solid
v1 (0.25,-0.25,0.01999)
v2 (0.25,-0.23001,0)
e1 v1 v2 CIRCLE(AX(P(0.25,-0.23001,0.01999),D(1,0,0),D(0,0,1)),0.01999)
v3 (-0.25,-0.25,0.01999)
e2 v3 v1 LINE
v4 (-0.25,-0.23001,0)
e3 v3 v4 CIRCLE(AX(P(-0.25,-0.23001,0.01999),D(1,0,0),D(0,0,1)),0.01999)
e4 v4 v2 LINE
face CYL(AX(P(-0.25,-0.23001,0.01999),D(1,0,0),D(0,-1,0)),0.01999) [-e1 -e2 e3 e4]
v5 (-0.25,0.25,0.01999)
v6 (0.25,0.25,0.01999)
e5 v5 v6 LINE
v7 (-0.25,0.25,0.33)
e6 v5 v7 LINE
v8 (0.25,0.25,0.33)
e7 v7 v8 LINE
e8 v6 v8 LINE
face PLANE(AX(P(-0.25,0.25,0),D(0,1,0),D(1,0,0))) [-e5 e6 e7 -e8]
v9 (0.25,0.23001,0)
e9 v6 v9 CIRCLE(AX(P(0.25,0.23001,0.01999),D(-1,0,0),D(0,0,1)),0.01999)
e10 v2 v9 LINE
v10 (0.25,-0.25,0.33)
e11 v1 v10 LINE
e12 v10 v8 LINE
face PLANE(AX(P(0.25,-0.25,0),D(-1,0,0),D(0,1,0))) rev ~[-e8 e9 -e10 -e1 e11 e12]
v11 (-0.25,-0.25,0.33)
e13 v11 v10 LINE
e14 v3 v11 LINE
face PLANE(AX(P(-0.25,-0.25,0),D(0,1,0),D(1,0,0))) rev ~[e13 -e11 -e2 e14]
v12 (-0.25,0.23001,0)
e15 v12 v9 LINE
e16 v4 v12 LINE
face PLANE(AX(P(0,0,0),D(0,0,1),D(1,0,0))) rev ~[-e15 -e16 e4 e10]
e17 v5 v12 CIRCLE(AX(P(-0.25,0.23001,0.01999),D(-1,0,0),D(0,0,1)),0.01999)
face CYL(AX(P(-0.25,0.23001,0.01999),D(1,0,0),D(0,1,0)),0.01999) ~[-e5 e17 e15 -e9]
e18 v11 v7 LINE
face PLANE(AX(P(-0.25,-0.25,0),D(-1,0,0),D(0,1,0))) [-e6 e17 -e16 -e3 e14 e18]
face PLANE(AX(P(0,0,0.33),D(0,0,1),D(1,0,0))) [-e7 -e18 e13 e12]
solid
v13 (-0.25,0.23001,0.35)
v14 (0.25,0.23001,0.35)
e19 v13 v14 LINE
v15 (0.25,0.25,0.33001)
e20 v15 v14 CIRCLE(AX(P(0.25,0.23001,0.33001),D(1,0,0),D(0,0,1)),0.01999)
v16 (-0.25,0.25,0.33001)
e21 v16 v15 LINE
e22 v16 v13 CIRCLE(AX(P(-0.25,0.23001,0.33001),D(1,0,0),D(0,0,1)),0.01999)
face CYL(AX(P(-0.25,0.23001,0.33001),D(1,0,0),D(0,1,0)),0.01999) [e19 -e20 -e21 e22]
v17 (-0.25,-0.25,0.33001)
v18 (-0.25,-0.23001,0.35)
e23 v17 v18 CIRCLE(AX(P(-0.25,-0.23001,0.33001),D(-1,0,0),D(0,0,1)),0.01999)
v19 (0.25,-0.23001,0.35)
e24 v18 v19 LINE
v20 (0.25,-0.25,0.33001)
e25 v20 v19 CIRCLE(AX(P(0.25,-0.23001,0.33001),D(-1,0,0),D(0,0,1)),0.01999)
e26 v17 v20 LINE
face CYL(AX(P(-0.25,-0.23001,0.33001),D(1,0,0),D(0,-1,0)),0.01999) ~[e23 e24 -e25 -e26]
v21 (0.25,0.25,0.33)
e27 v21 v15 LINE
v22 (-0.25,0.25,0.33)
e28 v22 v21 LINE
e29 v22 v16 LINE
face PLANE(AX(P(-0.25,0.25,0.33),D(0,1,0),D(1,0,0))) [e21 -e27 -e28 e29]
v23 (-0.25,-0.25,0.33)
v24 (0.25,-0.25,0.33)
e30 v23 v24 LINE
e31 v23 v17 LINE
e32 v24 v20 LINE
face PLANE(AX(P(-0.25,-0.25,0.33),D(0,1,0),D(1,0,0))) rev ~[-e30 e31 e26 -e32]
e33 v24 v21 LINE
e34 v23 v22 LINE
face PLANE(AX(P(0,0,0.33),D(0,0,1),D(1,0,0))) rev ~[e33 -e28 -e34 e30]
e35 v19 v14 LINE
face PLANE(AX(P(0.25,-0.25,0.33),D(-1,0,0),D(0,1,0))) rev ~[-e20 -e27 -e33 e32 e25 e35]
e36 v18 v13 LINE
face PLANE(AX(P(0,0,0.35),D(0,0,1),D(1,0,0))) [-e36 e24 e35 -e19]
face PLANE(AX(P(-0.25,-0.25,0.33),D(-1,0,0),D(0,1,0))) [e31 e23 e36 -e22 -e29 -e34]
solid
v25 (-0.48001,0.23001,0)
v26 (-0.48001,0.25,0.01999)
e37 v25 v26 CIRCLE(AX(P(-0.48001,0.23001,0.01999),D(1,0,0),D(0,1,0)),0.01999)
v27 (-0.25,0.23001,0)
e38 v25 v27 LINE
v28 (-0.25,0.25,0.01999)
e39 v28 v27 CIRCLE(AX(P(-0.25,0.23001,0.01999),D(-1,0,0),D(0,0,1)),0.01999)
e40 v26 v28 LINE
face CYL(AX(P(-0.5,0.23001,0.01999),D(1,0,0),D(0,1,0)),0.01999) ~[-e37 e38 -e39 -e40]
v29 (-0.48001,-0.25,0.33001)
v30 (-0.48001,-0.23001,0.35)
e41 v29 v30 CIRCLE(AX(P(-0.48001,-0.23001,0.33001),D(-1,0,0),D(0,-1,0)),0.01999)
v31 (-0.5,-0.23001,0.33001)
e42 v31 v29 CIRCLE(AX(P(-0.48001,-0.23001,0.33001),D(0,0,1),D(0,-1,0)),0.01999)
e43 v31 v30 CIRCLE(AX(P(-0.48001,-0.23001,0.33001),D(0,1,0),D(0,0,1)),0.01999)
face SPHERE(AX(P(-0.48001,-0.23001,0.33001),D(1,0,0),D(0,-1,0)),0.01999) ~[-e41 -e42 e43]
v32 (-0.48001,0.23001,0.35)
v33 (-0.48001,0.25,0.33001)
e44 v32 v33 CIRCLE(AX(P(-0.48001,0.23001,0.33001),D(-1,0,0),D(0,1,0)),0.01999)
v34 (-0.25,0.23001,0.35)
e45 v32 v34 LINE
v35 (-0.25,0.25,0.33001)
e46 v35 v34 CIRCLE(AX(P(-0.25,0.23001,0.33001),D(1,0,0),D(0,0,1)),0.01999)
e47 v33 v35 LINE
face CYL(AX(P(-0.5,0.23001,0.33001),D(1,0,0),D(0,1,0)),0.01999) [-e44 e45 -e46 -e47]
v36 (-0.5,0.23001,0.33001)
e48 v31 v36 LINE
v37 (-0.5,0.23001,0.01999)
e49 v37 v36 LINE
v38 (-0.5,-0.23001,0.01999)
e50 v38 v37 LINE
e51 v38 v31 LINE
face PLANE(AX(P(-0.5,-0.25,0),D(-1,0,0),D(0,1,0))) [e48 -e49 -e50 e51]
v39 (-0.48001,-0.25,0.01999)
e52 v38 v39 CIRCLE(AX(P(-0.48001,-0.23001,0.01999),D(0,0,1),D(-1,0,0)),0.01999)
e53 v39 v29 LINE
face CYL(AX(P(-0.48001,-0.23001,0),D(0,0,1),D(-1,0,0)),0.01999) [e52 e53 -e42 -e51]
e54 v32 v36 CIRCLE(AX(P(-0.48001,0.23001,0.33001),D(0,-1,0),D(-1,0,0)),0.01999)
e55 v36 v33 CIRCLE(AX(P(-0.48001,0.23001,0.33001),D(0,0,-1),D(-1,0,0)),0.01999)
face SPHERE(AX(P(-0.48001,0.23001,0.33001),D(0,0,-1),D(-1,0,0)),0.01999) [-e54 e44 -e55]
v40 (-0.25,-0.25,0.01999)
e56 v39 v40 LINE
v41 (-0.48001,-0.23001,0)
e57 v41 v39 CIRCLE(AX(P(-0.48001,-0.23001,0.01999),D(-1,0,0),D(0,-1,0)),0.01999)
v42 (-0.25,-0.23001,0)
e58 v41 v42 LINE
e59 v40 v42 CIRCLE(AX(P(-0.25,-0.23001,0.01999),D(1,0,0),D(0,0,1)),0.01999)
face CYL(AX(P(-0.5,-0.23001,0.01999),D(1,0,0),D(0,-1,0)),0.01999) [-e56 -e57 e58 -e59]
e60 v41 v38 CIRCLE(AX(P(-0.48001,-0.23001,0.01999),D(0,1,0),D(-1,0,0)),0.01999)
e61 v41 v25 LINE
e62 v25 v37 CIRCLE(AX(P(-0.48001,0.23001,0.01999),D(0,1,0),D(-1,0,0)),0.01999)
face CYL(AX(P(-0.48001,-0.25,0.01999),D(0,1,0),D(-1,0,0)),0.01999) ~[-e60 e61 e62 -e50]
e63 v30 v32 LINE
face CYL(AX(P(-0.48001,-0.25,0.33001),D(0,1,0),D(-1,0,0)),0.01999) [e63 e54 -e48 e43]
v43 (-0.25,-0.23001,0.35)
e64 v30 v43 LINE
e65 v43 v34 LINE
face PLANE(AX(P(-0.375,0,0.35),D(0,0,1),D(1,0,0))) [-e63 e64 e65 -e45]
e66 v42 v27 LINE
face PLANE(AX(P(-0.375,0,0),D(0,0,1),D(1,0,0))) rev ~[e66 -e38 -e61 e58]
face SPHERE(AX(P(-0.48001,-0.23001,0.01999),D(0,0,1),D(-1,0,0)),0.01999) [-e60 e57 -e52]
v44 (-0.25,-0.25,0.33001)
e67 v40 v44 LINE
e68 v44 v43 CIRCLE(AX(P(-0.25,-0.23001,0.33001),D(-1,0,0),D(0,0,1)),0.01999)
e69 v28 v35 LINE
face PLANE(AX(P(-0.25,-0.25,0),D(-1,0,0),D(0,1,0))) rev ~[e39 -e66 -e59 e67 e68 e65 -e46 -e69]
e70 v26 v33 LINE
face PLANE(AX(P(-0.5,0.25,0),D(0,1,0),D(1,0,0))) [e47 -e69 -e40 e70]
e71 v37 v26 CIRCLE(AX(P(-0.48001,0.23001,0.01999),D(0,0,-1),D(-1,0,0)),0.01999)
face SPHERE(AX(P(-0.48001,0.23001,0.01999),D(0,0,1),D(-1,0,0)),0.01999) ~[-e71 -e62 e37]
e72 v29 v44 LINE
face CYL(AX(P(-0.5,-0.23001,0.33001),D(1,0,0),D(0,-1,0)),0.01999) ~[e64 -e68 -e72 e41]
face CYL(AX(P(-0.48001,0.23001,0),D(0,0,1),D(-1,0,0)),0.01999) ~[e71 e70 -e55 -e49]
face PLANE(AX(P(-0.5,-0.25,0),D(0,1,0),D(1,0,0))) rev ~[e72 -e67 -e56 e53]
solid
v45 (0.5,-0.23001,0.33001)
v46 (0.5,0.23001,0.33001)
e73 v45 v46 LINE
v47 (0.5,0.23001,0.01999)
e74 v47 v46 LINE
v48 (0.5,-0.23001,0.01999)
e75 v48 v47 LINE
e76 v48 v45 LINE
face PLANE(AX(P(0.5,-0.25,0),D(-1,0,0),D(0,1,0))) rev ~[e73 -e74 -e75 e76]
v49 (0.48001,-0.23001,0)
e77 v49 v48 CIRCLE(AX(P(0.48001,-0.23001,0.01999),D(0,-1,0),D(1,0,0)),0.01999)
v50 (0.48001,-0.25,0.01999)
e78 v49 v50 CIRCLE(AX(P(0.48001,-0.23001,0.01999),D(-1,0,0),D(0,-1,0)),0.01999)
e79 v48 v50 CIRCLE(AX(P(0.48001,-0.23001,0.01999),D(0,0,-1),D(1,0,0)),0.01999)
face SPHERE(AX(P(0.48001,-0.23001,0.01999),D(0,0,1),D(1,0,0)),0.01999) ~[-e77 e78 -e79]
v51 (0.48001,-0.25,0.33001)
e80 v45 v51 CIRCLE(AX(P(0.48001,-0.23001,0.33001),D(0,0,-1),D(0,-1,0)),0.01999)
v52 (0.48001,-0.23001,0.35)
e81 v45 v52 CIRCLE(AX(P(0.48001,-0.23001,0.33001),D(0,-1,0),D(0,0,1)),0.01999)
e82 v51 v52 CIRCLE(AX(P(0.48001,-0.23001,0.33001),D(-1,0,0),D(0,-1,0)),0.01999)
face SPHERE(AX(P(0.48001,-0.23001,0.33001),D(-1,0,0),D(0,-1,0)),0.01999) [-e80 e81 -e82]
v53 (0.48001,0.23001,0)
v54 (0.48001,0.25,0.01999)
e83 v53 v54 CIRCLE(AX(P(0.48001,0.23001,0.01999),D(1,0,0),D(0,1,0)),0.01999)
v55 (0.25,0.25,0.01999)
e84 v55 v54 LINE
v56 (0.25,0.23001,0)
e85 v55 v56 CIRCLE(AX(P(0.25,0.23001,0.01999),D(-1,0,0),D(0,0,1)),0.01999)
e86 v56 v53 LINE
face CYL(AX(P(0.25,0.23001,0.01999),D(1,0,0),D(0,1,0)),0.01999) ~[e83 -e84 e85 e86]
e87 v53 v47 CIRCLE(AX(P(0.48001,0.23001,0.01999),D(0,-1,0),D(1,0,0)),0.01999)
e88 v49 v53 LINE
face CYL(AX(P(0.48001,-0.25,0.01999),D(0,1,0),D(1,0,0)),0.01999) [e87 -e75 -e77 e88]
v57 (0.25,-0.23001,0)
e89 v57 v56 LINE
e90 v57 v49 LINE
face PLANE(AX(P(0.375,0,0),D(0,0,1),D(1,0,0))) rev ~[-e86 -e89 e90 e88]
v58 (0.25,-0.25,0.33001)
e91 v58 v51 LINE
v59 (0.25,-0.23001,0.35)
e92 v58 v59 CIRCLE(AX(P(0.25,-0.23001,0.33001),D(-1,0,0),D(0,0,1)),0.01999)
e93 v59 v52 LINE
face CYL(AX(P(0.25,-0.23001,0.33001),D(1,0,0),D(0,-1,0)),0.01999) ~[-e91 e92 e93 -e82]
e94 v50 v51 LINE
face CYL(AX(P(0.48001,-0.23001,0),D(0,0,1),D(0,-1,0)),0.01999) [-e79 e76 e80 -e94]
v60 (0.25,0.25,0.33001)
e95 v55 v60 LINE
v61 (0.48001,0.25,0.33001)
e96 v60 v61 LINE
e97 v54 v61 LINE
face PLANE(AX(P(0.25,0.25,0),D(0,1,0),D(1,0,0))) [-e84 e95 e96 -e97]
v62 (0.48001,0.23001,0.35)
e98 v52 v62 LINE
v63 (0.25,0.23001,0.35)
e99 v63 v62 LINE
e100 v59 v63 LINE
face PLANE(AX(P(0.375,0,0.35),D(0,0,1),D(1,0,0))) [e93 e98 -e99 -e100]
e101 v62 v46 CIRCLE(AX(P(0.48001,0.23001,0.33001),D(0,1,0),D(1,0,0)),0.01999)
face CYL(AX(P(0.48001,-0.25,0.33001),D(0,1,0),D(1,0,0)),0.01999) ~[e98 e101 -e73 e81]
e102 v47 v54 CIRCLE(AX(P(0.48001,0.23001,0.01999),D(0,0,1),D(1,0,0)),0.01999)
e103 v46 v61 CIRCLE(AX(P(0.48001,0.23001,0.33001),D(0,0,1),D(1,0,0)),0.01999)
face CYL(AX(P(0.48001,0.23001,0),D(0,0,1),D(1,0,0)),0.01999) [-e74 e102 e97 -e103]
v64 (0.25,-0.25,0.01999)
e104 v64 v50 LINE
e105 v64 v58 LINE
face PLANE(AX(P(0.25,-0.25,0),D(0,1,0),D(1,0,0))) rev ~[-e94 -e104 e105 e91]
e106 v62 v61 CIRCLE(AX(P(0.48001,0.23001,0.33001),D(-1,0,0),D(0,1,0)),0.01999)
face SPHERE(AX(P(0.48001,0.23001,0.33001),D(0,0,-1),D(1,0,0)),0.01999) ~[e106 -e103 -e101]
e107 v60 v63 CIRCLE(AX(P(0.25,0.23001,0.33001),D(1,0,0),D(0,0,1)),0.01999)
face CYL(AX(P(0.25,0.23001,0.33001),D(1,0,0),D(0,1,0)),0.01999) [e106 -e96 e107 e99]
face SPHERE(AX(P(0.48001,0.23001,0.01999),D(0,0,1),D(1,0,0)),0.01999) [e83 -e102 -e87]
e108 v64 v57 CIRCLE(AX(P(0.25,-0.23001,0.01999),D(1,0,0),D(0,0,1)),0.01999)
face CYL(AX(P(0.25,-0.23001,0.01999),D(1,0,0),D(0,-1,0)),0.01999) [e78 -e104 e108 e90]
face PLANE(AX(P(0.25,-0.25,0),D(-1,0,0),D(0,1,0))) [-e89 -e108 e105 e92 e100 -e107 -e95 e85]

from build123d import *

# Parameters (mm, degrees)
F2_W     = 0.5
F2_H     = 0.5
F3_DEPTH = 0.33
F2_W_2   = 0.25
F4_DEPTH = 0.35
F5_DEPTH = 0.35
F6_DEPTH = 0.02
F7_R     = 0.01999
F7_2_R   = 0.01999
F7_3_R   = 0.01999
F7_4_R   = 0.01999


# Not quite as in the source:
# - a fillet or chamfer is up to 0.001 mm smaller than in the source, because OpenCascade refuses the exact size


with BuildPart() as f3:
    # F2 (on Top) → F3 (new body)
    with BuildSketch(Plane.XY):
        Rectangle(F2_W, F2_H)
    extrude(amount=F3_DEPTH)


with BuildPart() as f4:
    # F2 (on Top) → F4 (new body)
    with BuildSketch(Plane.XY):
        with Locations((-0.375, 0)):
            Rectangle(F2_W_2, F2_H)
    extrude(amount=F4_DEPTH)

    # F7 (radius 0.02 in the source; OpenCascade refuses exactly that, so slightly less here)
    f7_edges = [f4.edges().sort_by_distance(p)[0] for p in [
        (-0.375, -0.25, 0.35),
        (-0.5, 0.25, 0.175),
        (-0.5, -0.25, 0.175),
        (-0.5, 0, 0),
        (-0.5, 0, 0.35),
        (-0.375, 0.25, 0.35),
        (-0.375, 0.25, 0),
        (-0.375, -0.25, 0),
    ]]
    fillet(f7_edges, radius=F7_R)


with BuildPart() as f5:
    # F2 (on Top) → F5 (new body)
    with BuildSketch(Plane.XY):
        with Locations((0.375, 0)):
            Rectangle(F2_W_2, F2_H)
    extrude(amount=F5_DEPTH)

    # F7#2 (radius 0.02 in the source; OpenCascade refuses exactly that, so slightly less here)
    f7_2_edges = [f5.edges().sort_by_distance(p)[0] for p in [
        (0.375, -0.25, 0.35),
        (0.5, -0.25, 0.175),
        (0.5, 0.25, 0.175),
        (0.5, 0, 0),
        (0.5, 0, 0.35),
        (0.375, 0.25, 0.35),
        (0.375, 0.25, 0),
        (0.375, -0.25, 0),
    ]]
    fillet(f7_2_edges, radius=F7_2_R)


with BuildPart() as f6:
    # F6 (new): a face of the model
    f6_faces = [f3.part.faces().sort_by_distance(p)[0] for p in [
        (0, 0, 0.33),
    ]]
    extrude(f6_faces, amount=F6_DEPTH)

    # F7#4 (radius 0.02 in the source; OpenCascade refuses exactly that, so slightly less here)
    f7_4_edges = [f6.edges().sort_by_distance(p)[0] for p in [
        (0, -0.25, 0.35),
        (0, 0.25, 0.35),
    ]]
    fillet(f7_4_edges, radius=F7_4_R)


with BuildPart() as f3_1:
    add(f3.part)

    # F7#3 (radius 0.02 in the source; OpenCascade refuses exactly that, so slightly less here)
    f7_3_edges = [f3_1.edges().sort_by_distance(p)[0] for p in [
        (0, 0.25, 0),
        (0, -0.25, 0),
    ]]
    fillet(f7_3_edges, radius=F7_3_R)


solid = Compound([f4.part, f5.part, f6.part, f3_1.part])
